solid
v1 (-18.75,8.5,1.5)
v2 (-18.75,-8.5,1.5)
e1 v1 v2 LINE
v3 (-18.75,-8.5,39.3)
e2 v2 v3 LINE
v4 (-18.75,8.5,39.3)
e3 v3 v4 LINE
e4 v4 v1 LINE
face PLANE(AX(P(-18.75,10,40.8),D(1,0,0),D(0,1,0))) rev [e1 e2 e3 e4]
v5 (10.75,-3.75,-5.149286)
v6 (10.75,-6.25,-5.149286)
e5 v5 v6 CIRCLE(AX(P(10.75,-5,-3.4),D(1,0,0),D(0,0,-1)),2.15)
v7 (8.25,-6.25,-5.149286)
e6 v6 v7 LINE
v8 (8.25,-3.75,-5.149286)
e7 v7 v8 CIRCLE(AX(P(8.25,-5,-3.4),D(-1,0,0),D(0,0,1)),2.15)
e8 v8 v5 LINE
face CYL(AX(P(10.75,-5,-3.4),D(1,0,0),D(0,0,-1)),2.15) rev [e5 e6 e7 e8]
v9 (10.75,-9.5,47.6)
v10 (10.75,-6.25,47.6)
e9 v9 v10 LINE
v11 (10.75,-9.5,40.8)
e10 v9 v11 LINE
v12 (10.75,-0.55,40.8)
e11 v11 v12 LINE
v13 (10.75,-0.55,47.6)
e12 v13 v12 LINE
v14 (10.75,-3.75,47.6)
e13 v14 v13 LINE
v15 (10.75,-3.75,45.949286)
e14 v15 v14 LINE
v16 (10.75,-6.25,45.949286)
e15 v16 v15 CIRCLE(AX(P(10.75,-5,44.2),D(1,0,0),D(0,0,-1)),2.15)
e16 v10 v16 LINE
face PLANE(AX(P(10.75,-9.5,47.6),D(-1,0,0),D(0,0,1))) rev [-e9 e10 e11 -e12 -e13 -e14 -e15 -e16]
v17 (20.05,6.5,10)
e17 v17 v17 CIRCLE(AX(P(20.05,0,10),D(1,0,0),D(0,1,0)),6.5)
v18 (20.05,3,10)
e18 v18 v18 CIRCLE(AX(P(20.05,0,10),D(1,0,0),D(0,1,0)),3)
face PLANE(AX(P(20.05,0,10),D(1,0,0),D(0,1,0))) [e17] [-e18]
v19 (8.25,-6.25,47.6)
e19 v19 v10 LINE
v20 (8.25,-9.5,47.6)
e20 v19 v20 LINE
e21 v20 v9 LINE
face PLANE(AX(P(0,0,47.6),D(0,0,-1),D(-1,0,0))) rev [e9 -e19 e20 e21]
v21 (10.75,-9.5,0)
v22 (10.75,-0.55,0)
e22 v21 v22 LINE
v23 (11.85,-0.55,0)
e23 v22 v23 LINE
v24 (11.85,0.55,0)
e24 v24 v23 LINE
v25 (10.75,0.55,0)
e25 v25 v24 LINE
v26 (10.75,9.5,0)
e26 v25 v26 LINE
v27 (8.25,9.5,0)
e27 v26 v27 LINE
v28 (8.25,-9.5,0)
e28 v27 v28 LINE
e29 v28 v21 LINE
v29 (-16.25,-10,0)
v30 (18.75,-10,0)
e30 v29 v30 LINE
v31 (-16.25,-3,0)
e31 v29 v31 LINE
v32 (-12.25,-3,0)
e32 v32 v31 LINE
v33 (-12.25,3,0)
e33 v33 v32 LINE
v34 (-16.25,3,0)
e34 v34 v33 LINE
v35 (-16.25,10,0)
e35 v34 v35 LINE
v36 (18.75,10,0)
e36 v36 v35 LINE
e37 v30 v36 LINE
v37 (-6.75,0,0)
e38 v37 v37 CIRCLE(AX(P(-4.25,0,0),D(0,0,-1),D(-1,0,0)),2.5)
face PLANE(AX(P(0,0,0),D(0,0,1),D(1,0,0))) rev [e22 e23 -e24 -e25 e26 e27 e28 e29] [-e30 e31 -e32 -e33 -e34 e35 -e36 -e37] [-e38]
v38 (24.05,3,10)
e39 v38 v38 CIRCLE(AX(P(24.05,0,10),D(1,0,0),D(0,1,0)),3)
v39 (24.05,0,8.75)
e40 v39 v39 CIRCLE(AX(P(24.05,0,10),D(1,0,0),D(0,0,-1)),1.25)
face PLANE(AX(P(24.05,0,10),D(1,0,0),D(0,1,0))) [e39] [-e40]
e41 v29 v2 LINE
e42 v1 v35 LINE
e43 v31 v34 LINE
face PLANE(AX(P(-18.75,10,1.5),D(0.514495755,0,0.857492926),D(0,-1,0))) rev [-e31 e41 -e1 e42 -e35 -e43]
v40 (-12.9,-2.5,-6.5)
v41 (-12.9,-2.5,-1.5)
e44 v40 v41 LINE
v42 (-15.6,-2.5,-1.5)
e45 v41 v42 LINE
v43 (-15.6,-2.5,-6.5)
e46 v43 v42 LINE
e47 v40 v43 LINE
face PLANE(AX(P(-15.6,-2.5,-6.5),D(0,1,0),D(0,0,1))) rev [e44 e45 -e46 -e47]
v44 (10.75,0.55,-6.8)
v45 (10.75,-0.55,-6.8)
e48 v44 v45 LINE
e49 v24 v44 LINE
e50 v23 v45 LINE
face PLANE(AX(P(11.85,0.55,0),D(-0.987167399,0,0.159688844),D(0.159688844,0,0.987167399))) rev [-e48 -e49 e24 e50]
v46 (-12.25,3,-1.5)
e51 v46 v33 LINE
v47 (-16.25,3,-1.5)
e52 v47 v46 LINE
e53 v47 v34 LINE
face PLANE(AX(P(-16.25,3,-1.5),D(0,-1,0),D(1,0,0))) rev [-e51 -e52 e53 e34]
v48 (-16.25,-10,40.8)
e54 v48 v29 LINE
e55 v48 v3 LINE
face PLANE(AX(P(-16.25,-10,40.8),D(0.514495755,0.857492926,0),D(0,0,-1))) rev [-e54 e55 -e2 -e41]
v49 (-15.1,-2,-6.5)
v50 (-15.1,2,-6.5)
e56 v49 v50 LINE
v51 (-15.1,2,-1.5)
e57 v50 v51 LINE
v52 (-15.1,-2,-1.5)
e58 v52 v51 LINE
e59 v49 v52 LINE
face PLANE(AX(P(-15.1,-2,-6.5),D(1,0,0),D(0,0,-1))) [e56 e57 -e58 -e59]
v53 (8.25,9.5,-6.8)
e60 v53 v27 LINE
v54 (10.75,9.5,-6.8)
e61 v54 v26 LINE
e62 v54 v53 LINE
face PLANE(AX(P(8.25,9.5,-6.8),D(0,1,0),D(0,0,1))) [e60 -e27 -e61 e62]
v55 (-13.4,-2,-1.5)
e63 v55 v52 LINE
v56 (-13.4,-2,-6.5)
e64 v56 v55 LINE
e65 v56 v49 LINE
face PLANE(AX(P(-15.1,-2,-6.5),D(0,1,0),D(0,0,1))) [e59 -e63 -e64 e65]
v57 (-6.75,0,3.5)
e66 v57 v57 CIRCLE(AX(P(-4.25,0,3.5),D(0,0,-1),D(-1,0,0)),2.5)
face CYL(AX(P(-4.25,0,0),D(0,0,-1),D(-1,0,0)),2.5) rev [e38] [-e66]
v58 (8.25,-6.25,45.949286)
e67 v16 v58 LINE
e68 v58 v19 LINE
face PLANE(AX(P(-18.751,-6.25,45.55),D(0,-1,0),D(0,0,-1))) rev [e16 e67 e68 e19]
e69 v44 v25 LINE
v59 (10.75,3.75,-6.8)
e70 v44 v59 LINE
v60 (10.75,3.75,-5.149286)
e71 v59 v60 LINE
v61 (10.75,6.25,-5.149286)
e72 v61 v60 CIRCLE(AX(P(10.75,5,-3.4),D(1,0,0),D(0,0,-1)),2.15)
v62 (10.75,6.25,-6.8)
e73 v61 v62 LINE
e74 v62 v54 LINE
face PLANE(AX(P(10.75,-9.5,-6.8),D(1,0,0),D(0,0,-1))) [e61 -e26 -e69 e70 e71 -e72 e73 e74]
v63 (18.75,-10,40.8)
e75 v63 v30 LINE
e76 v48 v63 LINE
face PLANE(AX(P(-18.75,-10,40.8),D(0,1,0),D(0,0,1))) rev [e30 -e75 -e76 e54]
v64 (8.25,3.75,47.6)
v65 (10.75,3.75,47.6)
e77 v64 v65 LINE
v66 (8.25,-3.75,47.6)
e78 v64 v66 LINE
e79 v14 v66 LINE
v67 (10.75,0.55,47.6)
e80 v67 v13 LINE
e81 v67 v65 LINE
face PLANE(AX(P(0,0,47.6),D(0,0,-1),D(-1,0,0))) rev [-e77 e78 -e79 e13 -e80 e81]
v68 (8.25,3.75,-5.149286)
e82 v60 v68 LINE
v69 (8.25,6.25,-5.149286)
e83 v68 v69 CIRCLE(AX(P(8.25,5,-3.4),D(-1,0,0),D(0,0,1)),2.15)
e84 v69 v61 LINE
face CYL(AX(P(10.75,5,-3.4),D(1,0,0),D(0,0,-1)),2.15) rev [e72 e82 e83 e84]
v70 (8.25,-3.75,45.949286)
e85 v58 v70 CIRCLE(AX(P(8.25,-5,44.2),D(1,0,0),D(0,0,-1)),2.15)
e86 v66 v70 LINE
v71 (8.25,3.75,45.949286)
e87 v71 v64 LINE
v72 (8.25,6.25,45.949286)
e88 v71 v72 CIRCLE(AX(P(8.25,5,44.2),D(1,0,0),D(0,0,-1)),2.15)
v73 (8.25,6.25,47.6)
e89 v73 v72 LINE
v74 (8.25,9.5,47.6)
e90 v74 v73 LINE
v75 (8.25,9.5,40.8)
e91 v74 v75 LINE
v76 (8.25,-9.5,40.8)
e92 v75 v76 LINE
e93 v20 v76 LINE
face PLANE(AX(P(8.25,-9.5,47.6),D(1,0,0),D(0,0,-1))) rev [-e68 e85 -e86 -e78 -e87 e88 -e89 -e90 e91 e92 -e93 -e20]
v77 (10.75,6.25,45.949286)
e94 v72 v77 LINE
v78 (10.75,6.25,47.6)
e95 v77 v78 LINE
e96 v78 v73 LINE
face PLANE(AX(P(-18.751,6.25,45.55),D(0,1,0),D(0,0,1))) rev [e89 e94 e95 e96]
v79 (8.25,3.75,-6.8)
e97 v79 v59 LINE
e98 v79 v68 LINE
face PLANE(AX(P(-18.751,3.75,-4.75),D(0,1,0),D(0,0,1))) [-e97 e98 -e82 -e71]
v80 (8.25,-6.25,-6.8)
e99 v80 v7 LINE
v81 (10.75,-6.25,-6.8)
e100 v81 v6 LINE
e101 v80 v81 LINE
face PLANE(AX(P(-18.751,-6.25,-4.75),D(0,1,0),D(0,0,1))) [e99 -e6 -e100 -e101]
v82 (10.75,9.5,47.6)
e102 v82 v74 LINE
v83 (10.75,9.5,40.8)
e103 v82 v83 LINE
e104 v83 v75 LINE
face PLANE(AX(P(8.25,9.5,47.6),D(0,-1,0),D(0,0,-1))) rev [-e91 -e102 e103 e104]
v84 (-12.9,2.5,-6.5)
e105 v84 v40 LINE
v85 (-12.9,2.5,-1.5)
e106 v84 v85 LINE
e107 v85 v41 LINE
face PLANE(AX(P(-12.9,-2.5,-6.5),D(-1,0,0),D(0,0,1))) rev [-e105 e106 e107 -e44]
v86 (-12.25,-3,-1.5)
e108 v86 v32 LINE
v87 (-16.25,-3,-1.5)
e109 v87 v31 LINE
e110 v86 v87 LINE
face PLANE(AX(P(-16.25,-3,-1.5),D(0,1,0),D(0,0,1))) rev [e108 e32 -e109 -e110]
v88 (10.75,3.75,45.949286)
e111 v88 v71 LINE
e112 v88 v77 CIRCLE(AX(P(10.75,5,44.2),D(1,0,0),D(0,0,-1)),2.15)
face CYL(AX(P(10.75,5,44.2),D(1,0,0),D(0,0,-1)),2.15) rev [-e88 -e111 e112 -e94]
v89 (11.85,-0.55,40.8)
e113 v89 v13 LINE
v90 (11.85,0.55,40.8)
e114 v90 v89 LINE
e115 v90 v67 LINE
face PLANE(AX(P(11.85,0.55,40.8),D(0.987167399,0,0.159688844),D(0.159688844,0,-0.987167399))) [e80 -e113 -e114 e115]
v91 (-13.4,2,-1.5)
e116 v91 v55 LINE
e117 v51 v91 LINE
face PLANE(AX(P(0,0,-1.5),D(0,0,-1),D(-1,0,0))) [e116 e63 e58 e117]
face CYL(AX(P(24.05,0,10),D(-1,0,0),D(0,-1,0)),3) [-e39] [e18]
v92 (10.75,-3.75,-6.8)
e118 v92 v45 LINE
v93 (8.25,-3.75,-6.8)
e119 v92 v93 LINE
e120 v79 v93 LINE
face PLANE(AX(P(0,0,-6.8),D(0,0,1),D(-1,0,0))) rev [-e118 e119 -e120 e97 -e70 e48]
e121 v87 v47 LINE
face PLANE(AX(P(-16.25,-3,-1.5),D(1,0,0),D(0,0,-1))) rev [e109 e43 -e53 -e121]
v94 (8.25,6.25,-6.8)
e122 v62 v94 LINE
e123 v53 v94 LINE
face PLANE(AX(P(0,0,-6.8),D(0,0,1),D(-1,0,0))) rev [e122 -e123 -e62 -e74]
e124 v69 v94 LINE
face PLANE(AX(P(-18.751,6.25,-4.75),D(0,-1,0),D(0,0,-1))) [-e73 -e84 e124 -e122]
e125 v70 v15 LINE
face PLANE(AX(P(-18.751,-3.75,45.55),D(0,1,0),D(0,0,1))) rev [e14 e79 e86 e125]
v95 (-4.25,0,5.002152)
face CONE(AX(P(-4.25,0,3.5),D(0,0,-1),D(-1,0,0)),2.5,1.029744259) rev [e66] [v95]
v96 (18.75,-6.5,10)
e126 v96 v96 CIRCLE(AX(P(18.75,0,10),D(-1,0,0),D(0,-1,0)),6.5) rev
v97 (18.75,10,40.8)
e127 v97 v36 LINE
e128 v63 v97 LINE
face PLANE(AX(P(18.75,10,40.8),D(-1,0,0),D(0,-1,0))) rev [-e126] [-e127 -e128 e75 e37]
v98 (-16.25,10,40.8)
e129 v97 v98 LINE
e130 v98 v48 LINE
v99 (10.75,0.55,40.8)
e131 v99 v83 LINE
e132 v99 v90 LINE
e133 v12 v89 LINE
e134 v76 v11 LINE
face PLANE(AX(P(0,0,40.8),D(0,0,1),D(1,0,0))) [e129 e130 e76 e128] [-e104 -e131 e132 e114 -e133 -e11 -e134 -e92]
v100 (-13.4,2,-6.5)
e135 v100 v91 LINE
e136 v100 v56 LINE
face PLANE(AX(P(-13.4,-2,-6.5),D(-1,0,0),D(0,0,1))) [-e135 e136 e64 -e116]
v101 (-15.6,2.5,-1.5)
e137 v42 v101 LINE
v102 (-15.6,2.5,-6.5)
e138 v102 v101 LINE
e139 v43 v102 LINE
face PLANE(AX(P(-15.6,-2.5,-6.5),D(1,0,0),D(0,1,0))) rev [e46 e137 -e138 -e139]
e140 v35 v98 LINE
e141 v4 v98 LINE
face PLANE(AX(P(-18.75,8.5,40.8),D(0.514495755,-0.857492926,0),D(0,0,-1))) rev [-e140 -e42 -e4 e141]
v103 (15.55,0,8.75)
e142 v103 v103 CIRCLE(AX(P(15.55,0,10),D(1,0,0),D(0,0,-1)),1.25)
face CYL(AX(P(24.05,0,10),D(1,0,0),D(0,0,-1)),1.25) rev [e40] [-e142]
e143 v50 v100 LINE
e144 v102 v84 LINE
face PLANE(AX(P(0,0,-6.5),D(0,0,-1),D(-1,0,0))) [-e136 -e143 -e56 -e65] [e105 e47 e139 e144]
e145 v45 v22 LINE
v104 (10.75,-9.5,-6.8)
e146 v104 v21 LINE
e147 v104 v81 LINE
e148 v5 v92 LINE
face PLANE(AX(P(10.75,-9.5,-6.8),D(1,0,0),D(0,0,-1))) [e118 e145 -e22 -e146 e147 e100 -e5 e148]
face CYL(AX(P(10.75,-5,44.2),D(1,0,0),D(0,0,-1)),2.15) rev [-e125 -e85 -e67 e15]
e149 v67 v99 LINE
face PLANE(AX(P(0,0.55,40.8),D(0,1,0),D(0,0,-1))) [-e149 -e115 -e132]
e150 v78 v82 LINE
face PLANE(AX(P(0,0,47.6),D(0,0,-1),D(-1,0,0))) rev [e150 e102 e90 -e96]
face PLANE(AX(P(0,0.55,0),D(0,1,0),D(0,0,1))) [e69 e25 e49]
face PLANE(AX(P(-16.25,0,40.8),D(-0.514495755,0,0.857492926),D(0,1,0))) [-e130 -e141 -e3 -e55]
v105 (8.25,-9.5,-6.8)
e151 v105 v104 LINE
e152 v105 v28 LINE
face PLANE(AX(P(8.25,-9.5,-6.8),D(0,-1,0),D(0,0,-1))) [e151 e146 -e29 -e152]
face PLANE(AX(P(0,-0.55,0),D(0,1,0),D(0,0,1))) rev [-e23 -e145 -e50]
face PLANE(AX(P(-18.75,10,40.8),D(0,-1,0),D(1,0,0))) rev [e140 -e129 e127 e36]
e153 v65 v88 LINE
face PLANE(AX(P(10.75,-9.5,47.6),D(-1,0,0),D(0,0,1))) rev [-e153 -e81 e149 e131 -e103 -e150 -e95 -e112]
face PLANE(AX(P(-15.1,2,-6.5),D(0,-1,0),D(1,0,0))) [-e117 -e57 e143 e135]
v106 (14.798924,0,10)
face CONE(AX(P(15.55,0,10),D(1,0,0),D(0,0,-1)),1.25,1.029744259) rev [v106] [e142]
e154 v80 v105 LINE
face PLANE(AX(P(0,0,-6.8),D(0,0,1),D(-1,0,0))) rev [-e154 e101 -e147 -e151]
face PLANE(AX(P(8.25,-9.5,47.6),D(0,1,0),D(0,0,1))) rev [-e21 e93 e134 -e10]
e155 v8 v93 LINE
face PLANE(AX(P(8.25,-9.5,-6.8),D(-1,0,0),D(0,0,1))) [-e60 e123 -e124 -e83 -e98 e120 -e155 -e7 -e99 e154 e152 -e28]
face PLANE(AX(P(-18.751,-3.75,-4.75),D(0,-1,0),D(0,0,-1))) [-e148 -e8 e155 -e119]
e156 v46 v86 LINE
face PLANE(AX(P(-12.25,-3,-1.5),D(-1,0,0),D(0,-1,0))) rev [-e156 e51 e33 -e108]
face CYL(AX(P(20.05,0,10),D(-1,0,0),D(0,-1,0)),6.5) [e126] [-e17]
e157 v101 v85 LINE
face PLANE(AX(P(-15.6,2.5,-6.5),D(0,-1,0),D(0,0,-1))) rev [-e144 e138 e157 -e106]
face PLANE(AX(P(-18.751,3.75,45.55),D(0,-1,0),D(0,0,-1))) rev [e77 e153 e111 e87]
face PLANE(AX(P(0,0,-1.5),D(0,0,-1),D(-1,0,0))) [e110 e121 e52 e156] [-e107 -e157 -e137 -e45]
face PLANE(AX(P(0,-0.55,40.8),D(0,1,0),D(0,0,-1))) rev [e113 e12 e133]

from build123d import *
from OCP.BRepFilletAPI import BRepFilletAPI_MakeChamfer

# Parameters (mm, degrees)
SKIZZE1_W                           = 37.5
SKIZZE1_H                           = 20
AUFSATZ_LINEAR_AUSTRAGEN1_DEPTH     = 40.8
SKIZZE2_W                           = 2.5
SKIZZE2_H                           = 19
AUFSATZ_LINEAR_AUSTRAGEN2_DEPTH     = 6.8
F_4_3_4_3_DIAMETER_HOLE2_AT_2_COUNT = 2
F_4_3_4_3_DIAMETER_HOLE2_AT_2_PITCH = 10
CUT_EXTRUDE1_REACH                  = 58.886
SKETCH1_W                           = 3
SKETCH1_H                           = 2.5
BOSS_EXTRUDE1_DEPTH                 = 0.55
SKIZZE5_R                           = 6.5
AUFSATZ_LINEAR_AUSTRAGEN3_DEPTH     = 1.3
SKIZZE6_R                           = 3
AUFSATZ_LINEAR_AUSTRAGEN4_DEPTH     = 4
SKIZZE7_W                           = 4
SKIZZE7_H                           = 6
AUFSATZ_LINEAR_AUSTRAGEN5_DEPTH     = 1.5
SKIZZE8_W                           = 2.7
SKIZZE8_H                           = 5
SKIZZE8_W_2                         = 1.7
SKIZZE8_H_2                         = 4
AUFSATZ_LINEAR_AUSTRAGEN6_DEPTH     = 5
F_5_0_5_DIAMETER_HOLE1_D            = 5
F_5_0_5_DIAMETER_HOLE1_DEPTH        = 3.5
F_5_0_5_DIAMETER_HOLE1_TIP          = 1.502151548
M3_GEWINDEBOHRUNG1_D                = 2.5
M3_GEWINDEBOHRUNG1_DEPTH            = 8.5
M3_GEWINDEBOHRUNG1_TIP              = 0.751075774
CHAMFER1_SIZE                       = 1.5
CHAMFER1_SIZE_2                     = 2.5


with BuildPart() as part:
    # Skizze1 → Aufsatz-Linear austragen1 (new body)
    with BuildSketch(Plane.XY):
        Rectangle(SKIZZE1_W, SKIZZE1_H)
    extrude(amount=AUFSATZ_LINEAR_AUSTRAGEN1_DEPTH)

    # Skizze2 → Aufsatz-Linear austragen2 (add)
    with BuildSketch(Plane.XY.offset(40.8)):
        with Locations((9.5, 0)):
            Rectangle(SKIZZE2_W, SKIZZE2_H)
    aufsatz_linear_austragen2 = extrude(amount=AUFSATZ_LINEAR_AUSTRAGEN2_DEPTH)

    # Skizze3 → Ø4.3 (4.3) Diameter Hole2 (revolve, cut)
    with BuildSketch(Plane(origin=(10.75, 5, 44.2), x_dir=(0, 0, -1), z_dir=(0, 1, 0))):
        Polygon((0, 0), (0, 11.291850331), (2.15, 10), (2.15, 0), align=None)
    f_4_3_4_3_diameter_hole2 = revolve(axis=Axis((17.1, 5, 44.2), (-1, 0, 0)), mode=Mode.SUBTRACT)

    # Ø4.3 (4.3) Diameter Hole2 at 2: Ø4.3 (4.3) Diameter Hole2 ×2
    with Locations(*[(0, -i * F_4_3_4_3_DIAMETER_HOLE2_AT_2_PITCH, 0) for i in range(1, F_4_3_4_3_DIAMETER_HOLE2_AT_2_COUNT)]):
        add(f_4_3_4_3_diameter_hole2, mode=Mode.SUBTRACT)

    # Sketch1 → Cut-Extrude1 (cut, up to next)
    with BuildSketch(Plane(origin=(10.75, 0, 0), x_dir=(0, 0, -1), z_dir=(1, 0, 0)), mode=Mode.PRIVATE) as cut_extrude1_sk1:
        with Locations((-47.05, 5)):
            Rectangle(SKETCH1_W, SKETCH1_H)
    cut_extrude1_tool1 = extrude(cut_extrude1_sk1.sketch, amount=-CUT_EXTRUDE1_REACH, mode=Mode.PRIVATE) & part.part
    # Sketch1 → Cut-Extrude1 (cut, up to next)
    with BuildSketch(Plane(origin=(10.75, 0, 0), x_dir=(0, 0, -1), z_dir=(1, 0, 0)), mode=Mode.PRIVATE) as cut_extrude1_sk2:
        with Locations((-47.05, -5)):
            Rectangle(SKETCH1_W, SKETCH1_H)
    cut_extrude1_tool2 = extrude(cut_extrude1_sk2.sketch, amount=-CUT_EXTRUDE1_REACH, mode=Mode.PRIVATE) & part.part
    cut_extrude1_1 = cut_extrude1_tool1.solids().sort_by_distance((10.75, 5, 47.05))[0]
    add(cut_extrude1_1, mode=Mode.SUBTRACT)
    cut_extrude1_2 = cut_extrude1_tool2.solids().sort_by_distance((10.75, -5, 47.05))[0]
    add(cut_extrude1_2, mode=Mode.SUBTRACT)
    cut_extrude1 = cut_extrude1_1 + cut_extrude1_2  # Cut-Extrude1 as one shape, for the pattern or mirror that repeats it

    # Spiegeln2: Aufsatz-Linear austragen2, Ø4.3 (4.3) Diameter Hole2, Cut-Extrude1 across plane
    add(aufsatz_linear_austragen2.mirror(Plane(origin=(0, 0, 20.4), x_dir=(1, 0, 0), z_dir=(0, 0, -1))))
    add(f_4_3_4_3_diameter_hole2.mirror(Plane(origin=(0, 0, 20.4), x_dir=(1, 0, 0), z_dir=(0, 0, -1))), mode=Mode.SUBTRACT)
    add(cut_extrude1.mirror(Plane(origin=(0, 0, 20.4), x_dir=(1, 0, 0), z_dir=(0, 0, -1))), mode=Mode.SUBTRACT)

    # Spiegeln2 copy 1 sketch → Spiegeln2 copy 1 (revolve, cut)
    with BuildSketch(Plane(origin=(10.75, -5, -3.4), x_dir=(0, 0, 1), z_dir=(0, 1, 0))):
        Polygon((0, 0), (0, -11.291850331), (2.15, -10), (2.15, 0), align=None)
    revolve(axis=Axis((17.1, -5, -3.4), (1, 0, 0)), mode=Mode.SUBTRACT)

    # Sketch3 → Boss-Extrude1 (add, symmetric)
    with BuildSketch(Plane(origin=(0, 0, 0), x_dir=(1, 0, 0), z_dir=(0, 1, 0))):
        Polygon((10.75, 0), (11.85, 0), (10.75, 6.8), align=None)
    boss_extrude1 = extrude(amount=BOSS_EXTRUDE1_DEPTH, both=True)

    # Skizze5 → Aufsatz-Linear austragen3 (add)
    with BuildSketch(Plane(origin=(18.75, 0, 0), x_dir=(0, 0, -1), z_dir=(1, 0, 0))):
        with Locations(Location((-10, 0, 0), (0, 0, 270))):
            Circle(SKIZZE5_R)
    extrude(amount=AUFSATZ_LINEAR_AUSTRAGEN3_DEPTH)

    # Skizze6 → Aufsatz-Linear austragen4 (add)
    with BuildSketch(Plane(origin=(20.05, 0, 0), x_dir=(0, 0, -1), z_dir=(1, 0, 0))):
        with Locations(Location((-10, 0, 0), (0, 0, 90))):
            Circle(SKIZZE6_R)
    extrude(amount=AUFSATZ_LINEAR_AUSTRAGEN4_DEPTH)

    # Skizze7 → Aufsatz-Linear austragen5 (add)
    with BuildSketch(Plane(origin=(0, 0, 0), x_dir=(-1, 0, 0), z_dir=(0, 0, -1))):
        with Locations((14.25, 0)):
            Rectangle(SKIZZE7_W, SKIZZE7_H)
    extrude(amount=AUFSATZ_LINEAR_AUSTRAGEN5_DEPTH)

    # Skizze8 → Aufsatz-Linear austragen6 (add)
    with BuildSketch(Plane(origin=(0, 0, -1.5), x_dir=(-1, 0, 0), z_dir=(0, 0, -1))):
        with Locations((14.25, 0)):
            Rectangle(SKIZZE8_W, SKIZZE8_H)
        with Locations((14.25, 0)):
            Rectangle(SKIZZE8_W_2, SKIZZE8_H_2, mode=Mode.SUBTRACT)
    extrude(amount=AUFSATZ_LINEAR_AUSTRAGEN6_DEPTH)

    # Ø5.0 (5) Diameter Hole1
    with Locations(Plane(origin=(0, 0, 0), x_dir=(-1, 0, 0), z_dir=(0, 0, -1))):
        with Locations((4.25, 0)):
            Hole(F_5_0_5_DIAMETER_HOLE1_D / 2, depth=F_5_0_5_DIAMETER_HOLE1_DEPTH)
            with Locations((0, 0, -(F_5_0_5_DIAMETER_HOLE1_DEPTH + F_5_0_5_DIAMETER_HOLE1_TIP / 2))):  # 118° drill point
                Cone(0, F_5_0_5_DIAMETER_HOLE1_D / 2, F_5_0_5_DIAMETER_HOLE1_TIP, mode=Mode.SUBTRACT)

    # M3 Gewindebohrung1
    with Locations(Plane(origin=(24.05, 0, 0), x_dir=(0, 0, -1), z_dir=(1, 0, 0))):
        with Locations((-10, 0)):
            Hole(M3_GEWINDEBOHRUNG1_D / 2, depth=M3_GEWINDEBOHRUNG1_DEPTH)
            with Locations((0, 0, -(M3_GEWINDEBOHRUNG1_DEPTH + M3_GEWINDEBOHRUNG1_TIP / 2))):  # 118° drill point
                Cone(0, M3_GEWINDEBOHRUNG1_D / 2, M3_GEWINDEBOHRUNG1_TIP, mode=Mode.SUBTRACT)

    # Mirror1: Boss-Extrude1 across plane
    add(boss_extrude1.mirror(Plane(origin=(0, 0, 20.4), x_dir=(1, 0, 0), z_dir=(0, 0, -1))))

    # Chamfer1
    chamfer1_edges_1 = [part.edges().sort_by_distance(p)[0] for p in [
        (-18.75, 0, 40.8),
    ]]
    chamfer1_side_1 = [part.faces().sort_by_distance(p)[0] for p in [
        (-18.75, 0, 40.77),
    ]]
    chamfer1_edges_2 = [part.edges().sort_by_distance(p)[0] for p in [
        (-18.75, 0, 0),
    ]]
    chamfer1_side_2 = [part.faces().sort_by_distance(p)[0] for p in [
        (-18.75, 0, 0.03),
    ]]
    chamfer1_edges_3 = [part.edges().sort_by_distance(p)[0] for p in [
        (-18.75, 10, 20.4),
    ]]
    chamfer1_side_3 = [part.faces().sort_by_distance(p)[0] for p in [
        (-18.72, 10, 20.4),
    ]]
    chamfer1_edges_4 = [part.edges().sort_by_distance(p)[0] for p in [
        (-18.75, -10, 20.4),
    ]]
    chamfer1_side_4 = [part.faces().sort_by_distance(p)[0] for p in [
        (-18.75, -9.97, 20.4),
    ]]
    chamfer1 = BRepFilletAPI_MakeChamfer(part.part.solid().wrapped)
    for e in chamfer1_edges_1:
        chamfer1.Add(CHAMFER1_SIZE - 0.0001, CHAMFER1_SIZE_2 - 0.0001, e.wrapped, chamfer1_side_1[0].wrapped)
    for e in chamfer1_edges_2:
        chamfer1.Add(CHAMFER1_SIZE - 0.0001, CHAMFER1_SIZE_2 - 0.0001, e.wrapped, chamfer1_side_2[0].wrapped)
    for e in chamfer1_edges_3:
        chamfer1.Add(CHAMFER1_SIZE_2 - 0.0001, CHAMFER1_SIZE - 0.0001, e.wrapped, chamfer1_side_3[0].wrapped)
    for e in chamfer1_edges_4:
        chamfer1.Add(CHAMFER1_SIZE - 0.0001, CHAMFER1_SIZE_2 - 0.0001, e.wrapped, chamfer1_side_4[0].wrapped)
    add(Compound.cast(chamfer1.Shape()), mode=Mode.REPLACE)  # a hair under: the kernel refuses the full size


solid = part.part
